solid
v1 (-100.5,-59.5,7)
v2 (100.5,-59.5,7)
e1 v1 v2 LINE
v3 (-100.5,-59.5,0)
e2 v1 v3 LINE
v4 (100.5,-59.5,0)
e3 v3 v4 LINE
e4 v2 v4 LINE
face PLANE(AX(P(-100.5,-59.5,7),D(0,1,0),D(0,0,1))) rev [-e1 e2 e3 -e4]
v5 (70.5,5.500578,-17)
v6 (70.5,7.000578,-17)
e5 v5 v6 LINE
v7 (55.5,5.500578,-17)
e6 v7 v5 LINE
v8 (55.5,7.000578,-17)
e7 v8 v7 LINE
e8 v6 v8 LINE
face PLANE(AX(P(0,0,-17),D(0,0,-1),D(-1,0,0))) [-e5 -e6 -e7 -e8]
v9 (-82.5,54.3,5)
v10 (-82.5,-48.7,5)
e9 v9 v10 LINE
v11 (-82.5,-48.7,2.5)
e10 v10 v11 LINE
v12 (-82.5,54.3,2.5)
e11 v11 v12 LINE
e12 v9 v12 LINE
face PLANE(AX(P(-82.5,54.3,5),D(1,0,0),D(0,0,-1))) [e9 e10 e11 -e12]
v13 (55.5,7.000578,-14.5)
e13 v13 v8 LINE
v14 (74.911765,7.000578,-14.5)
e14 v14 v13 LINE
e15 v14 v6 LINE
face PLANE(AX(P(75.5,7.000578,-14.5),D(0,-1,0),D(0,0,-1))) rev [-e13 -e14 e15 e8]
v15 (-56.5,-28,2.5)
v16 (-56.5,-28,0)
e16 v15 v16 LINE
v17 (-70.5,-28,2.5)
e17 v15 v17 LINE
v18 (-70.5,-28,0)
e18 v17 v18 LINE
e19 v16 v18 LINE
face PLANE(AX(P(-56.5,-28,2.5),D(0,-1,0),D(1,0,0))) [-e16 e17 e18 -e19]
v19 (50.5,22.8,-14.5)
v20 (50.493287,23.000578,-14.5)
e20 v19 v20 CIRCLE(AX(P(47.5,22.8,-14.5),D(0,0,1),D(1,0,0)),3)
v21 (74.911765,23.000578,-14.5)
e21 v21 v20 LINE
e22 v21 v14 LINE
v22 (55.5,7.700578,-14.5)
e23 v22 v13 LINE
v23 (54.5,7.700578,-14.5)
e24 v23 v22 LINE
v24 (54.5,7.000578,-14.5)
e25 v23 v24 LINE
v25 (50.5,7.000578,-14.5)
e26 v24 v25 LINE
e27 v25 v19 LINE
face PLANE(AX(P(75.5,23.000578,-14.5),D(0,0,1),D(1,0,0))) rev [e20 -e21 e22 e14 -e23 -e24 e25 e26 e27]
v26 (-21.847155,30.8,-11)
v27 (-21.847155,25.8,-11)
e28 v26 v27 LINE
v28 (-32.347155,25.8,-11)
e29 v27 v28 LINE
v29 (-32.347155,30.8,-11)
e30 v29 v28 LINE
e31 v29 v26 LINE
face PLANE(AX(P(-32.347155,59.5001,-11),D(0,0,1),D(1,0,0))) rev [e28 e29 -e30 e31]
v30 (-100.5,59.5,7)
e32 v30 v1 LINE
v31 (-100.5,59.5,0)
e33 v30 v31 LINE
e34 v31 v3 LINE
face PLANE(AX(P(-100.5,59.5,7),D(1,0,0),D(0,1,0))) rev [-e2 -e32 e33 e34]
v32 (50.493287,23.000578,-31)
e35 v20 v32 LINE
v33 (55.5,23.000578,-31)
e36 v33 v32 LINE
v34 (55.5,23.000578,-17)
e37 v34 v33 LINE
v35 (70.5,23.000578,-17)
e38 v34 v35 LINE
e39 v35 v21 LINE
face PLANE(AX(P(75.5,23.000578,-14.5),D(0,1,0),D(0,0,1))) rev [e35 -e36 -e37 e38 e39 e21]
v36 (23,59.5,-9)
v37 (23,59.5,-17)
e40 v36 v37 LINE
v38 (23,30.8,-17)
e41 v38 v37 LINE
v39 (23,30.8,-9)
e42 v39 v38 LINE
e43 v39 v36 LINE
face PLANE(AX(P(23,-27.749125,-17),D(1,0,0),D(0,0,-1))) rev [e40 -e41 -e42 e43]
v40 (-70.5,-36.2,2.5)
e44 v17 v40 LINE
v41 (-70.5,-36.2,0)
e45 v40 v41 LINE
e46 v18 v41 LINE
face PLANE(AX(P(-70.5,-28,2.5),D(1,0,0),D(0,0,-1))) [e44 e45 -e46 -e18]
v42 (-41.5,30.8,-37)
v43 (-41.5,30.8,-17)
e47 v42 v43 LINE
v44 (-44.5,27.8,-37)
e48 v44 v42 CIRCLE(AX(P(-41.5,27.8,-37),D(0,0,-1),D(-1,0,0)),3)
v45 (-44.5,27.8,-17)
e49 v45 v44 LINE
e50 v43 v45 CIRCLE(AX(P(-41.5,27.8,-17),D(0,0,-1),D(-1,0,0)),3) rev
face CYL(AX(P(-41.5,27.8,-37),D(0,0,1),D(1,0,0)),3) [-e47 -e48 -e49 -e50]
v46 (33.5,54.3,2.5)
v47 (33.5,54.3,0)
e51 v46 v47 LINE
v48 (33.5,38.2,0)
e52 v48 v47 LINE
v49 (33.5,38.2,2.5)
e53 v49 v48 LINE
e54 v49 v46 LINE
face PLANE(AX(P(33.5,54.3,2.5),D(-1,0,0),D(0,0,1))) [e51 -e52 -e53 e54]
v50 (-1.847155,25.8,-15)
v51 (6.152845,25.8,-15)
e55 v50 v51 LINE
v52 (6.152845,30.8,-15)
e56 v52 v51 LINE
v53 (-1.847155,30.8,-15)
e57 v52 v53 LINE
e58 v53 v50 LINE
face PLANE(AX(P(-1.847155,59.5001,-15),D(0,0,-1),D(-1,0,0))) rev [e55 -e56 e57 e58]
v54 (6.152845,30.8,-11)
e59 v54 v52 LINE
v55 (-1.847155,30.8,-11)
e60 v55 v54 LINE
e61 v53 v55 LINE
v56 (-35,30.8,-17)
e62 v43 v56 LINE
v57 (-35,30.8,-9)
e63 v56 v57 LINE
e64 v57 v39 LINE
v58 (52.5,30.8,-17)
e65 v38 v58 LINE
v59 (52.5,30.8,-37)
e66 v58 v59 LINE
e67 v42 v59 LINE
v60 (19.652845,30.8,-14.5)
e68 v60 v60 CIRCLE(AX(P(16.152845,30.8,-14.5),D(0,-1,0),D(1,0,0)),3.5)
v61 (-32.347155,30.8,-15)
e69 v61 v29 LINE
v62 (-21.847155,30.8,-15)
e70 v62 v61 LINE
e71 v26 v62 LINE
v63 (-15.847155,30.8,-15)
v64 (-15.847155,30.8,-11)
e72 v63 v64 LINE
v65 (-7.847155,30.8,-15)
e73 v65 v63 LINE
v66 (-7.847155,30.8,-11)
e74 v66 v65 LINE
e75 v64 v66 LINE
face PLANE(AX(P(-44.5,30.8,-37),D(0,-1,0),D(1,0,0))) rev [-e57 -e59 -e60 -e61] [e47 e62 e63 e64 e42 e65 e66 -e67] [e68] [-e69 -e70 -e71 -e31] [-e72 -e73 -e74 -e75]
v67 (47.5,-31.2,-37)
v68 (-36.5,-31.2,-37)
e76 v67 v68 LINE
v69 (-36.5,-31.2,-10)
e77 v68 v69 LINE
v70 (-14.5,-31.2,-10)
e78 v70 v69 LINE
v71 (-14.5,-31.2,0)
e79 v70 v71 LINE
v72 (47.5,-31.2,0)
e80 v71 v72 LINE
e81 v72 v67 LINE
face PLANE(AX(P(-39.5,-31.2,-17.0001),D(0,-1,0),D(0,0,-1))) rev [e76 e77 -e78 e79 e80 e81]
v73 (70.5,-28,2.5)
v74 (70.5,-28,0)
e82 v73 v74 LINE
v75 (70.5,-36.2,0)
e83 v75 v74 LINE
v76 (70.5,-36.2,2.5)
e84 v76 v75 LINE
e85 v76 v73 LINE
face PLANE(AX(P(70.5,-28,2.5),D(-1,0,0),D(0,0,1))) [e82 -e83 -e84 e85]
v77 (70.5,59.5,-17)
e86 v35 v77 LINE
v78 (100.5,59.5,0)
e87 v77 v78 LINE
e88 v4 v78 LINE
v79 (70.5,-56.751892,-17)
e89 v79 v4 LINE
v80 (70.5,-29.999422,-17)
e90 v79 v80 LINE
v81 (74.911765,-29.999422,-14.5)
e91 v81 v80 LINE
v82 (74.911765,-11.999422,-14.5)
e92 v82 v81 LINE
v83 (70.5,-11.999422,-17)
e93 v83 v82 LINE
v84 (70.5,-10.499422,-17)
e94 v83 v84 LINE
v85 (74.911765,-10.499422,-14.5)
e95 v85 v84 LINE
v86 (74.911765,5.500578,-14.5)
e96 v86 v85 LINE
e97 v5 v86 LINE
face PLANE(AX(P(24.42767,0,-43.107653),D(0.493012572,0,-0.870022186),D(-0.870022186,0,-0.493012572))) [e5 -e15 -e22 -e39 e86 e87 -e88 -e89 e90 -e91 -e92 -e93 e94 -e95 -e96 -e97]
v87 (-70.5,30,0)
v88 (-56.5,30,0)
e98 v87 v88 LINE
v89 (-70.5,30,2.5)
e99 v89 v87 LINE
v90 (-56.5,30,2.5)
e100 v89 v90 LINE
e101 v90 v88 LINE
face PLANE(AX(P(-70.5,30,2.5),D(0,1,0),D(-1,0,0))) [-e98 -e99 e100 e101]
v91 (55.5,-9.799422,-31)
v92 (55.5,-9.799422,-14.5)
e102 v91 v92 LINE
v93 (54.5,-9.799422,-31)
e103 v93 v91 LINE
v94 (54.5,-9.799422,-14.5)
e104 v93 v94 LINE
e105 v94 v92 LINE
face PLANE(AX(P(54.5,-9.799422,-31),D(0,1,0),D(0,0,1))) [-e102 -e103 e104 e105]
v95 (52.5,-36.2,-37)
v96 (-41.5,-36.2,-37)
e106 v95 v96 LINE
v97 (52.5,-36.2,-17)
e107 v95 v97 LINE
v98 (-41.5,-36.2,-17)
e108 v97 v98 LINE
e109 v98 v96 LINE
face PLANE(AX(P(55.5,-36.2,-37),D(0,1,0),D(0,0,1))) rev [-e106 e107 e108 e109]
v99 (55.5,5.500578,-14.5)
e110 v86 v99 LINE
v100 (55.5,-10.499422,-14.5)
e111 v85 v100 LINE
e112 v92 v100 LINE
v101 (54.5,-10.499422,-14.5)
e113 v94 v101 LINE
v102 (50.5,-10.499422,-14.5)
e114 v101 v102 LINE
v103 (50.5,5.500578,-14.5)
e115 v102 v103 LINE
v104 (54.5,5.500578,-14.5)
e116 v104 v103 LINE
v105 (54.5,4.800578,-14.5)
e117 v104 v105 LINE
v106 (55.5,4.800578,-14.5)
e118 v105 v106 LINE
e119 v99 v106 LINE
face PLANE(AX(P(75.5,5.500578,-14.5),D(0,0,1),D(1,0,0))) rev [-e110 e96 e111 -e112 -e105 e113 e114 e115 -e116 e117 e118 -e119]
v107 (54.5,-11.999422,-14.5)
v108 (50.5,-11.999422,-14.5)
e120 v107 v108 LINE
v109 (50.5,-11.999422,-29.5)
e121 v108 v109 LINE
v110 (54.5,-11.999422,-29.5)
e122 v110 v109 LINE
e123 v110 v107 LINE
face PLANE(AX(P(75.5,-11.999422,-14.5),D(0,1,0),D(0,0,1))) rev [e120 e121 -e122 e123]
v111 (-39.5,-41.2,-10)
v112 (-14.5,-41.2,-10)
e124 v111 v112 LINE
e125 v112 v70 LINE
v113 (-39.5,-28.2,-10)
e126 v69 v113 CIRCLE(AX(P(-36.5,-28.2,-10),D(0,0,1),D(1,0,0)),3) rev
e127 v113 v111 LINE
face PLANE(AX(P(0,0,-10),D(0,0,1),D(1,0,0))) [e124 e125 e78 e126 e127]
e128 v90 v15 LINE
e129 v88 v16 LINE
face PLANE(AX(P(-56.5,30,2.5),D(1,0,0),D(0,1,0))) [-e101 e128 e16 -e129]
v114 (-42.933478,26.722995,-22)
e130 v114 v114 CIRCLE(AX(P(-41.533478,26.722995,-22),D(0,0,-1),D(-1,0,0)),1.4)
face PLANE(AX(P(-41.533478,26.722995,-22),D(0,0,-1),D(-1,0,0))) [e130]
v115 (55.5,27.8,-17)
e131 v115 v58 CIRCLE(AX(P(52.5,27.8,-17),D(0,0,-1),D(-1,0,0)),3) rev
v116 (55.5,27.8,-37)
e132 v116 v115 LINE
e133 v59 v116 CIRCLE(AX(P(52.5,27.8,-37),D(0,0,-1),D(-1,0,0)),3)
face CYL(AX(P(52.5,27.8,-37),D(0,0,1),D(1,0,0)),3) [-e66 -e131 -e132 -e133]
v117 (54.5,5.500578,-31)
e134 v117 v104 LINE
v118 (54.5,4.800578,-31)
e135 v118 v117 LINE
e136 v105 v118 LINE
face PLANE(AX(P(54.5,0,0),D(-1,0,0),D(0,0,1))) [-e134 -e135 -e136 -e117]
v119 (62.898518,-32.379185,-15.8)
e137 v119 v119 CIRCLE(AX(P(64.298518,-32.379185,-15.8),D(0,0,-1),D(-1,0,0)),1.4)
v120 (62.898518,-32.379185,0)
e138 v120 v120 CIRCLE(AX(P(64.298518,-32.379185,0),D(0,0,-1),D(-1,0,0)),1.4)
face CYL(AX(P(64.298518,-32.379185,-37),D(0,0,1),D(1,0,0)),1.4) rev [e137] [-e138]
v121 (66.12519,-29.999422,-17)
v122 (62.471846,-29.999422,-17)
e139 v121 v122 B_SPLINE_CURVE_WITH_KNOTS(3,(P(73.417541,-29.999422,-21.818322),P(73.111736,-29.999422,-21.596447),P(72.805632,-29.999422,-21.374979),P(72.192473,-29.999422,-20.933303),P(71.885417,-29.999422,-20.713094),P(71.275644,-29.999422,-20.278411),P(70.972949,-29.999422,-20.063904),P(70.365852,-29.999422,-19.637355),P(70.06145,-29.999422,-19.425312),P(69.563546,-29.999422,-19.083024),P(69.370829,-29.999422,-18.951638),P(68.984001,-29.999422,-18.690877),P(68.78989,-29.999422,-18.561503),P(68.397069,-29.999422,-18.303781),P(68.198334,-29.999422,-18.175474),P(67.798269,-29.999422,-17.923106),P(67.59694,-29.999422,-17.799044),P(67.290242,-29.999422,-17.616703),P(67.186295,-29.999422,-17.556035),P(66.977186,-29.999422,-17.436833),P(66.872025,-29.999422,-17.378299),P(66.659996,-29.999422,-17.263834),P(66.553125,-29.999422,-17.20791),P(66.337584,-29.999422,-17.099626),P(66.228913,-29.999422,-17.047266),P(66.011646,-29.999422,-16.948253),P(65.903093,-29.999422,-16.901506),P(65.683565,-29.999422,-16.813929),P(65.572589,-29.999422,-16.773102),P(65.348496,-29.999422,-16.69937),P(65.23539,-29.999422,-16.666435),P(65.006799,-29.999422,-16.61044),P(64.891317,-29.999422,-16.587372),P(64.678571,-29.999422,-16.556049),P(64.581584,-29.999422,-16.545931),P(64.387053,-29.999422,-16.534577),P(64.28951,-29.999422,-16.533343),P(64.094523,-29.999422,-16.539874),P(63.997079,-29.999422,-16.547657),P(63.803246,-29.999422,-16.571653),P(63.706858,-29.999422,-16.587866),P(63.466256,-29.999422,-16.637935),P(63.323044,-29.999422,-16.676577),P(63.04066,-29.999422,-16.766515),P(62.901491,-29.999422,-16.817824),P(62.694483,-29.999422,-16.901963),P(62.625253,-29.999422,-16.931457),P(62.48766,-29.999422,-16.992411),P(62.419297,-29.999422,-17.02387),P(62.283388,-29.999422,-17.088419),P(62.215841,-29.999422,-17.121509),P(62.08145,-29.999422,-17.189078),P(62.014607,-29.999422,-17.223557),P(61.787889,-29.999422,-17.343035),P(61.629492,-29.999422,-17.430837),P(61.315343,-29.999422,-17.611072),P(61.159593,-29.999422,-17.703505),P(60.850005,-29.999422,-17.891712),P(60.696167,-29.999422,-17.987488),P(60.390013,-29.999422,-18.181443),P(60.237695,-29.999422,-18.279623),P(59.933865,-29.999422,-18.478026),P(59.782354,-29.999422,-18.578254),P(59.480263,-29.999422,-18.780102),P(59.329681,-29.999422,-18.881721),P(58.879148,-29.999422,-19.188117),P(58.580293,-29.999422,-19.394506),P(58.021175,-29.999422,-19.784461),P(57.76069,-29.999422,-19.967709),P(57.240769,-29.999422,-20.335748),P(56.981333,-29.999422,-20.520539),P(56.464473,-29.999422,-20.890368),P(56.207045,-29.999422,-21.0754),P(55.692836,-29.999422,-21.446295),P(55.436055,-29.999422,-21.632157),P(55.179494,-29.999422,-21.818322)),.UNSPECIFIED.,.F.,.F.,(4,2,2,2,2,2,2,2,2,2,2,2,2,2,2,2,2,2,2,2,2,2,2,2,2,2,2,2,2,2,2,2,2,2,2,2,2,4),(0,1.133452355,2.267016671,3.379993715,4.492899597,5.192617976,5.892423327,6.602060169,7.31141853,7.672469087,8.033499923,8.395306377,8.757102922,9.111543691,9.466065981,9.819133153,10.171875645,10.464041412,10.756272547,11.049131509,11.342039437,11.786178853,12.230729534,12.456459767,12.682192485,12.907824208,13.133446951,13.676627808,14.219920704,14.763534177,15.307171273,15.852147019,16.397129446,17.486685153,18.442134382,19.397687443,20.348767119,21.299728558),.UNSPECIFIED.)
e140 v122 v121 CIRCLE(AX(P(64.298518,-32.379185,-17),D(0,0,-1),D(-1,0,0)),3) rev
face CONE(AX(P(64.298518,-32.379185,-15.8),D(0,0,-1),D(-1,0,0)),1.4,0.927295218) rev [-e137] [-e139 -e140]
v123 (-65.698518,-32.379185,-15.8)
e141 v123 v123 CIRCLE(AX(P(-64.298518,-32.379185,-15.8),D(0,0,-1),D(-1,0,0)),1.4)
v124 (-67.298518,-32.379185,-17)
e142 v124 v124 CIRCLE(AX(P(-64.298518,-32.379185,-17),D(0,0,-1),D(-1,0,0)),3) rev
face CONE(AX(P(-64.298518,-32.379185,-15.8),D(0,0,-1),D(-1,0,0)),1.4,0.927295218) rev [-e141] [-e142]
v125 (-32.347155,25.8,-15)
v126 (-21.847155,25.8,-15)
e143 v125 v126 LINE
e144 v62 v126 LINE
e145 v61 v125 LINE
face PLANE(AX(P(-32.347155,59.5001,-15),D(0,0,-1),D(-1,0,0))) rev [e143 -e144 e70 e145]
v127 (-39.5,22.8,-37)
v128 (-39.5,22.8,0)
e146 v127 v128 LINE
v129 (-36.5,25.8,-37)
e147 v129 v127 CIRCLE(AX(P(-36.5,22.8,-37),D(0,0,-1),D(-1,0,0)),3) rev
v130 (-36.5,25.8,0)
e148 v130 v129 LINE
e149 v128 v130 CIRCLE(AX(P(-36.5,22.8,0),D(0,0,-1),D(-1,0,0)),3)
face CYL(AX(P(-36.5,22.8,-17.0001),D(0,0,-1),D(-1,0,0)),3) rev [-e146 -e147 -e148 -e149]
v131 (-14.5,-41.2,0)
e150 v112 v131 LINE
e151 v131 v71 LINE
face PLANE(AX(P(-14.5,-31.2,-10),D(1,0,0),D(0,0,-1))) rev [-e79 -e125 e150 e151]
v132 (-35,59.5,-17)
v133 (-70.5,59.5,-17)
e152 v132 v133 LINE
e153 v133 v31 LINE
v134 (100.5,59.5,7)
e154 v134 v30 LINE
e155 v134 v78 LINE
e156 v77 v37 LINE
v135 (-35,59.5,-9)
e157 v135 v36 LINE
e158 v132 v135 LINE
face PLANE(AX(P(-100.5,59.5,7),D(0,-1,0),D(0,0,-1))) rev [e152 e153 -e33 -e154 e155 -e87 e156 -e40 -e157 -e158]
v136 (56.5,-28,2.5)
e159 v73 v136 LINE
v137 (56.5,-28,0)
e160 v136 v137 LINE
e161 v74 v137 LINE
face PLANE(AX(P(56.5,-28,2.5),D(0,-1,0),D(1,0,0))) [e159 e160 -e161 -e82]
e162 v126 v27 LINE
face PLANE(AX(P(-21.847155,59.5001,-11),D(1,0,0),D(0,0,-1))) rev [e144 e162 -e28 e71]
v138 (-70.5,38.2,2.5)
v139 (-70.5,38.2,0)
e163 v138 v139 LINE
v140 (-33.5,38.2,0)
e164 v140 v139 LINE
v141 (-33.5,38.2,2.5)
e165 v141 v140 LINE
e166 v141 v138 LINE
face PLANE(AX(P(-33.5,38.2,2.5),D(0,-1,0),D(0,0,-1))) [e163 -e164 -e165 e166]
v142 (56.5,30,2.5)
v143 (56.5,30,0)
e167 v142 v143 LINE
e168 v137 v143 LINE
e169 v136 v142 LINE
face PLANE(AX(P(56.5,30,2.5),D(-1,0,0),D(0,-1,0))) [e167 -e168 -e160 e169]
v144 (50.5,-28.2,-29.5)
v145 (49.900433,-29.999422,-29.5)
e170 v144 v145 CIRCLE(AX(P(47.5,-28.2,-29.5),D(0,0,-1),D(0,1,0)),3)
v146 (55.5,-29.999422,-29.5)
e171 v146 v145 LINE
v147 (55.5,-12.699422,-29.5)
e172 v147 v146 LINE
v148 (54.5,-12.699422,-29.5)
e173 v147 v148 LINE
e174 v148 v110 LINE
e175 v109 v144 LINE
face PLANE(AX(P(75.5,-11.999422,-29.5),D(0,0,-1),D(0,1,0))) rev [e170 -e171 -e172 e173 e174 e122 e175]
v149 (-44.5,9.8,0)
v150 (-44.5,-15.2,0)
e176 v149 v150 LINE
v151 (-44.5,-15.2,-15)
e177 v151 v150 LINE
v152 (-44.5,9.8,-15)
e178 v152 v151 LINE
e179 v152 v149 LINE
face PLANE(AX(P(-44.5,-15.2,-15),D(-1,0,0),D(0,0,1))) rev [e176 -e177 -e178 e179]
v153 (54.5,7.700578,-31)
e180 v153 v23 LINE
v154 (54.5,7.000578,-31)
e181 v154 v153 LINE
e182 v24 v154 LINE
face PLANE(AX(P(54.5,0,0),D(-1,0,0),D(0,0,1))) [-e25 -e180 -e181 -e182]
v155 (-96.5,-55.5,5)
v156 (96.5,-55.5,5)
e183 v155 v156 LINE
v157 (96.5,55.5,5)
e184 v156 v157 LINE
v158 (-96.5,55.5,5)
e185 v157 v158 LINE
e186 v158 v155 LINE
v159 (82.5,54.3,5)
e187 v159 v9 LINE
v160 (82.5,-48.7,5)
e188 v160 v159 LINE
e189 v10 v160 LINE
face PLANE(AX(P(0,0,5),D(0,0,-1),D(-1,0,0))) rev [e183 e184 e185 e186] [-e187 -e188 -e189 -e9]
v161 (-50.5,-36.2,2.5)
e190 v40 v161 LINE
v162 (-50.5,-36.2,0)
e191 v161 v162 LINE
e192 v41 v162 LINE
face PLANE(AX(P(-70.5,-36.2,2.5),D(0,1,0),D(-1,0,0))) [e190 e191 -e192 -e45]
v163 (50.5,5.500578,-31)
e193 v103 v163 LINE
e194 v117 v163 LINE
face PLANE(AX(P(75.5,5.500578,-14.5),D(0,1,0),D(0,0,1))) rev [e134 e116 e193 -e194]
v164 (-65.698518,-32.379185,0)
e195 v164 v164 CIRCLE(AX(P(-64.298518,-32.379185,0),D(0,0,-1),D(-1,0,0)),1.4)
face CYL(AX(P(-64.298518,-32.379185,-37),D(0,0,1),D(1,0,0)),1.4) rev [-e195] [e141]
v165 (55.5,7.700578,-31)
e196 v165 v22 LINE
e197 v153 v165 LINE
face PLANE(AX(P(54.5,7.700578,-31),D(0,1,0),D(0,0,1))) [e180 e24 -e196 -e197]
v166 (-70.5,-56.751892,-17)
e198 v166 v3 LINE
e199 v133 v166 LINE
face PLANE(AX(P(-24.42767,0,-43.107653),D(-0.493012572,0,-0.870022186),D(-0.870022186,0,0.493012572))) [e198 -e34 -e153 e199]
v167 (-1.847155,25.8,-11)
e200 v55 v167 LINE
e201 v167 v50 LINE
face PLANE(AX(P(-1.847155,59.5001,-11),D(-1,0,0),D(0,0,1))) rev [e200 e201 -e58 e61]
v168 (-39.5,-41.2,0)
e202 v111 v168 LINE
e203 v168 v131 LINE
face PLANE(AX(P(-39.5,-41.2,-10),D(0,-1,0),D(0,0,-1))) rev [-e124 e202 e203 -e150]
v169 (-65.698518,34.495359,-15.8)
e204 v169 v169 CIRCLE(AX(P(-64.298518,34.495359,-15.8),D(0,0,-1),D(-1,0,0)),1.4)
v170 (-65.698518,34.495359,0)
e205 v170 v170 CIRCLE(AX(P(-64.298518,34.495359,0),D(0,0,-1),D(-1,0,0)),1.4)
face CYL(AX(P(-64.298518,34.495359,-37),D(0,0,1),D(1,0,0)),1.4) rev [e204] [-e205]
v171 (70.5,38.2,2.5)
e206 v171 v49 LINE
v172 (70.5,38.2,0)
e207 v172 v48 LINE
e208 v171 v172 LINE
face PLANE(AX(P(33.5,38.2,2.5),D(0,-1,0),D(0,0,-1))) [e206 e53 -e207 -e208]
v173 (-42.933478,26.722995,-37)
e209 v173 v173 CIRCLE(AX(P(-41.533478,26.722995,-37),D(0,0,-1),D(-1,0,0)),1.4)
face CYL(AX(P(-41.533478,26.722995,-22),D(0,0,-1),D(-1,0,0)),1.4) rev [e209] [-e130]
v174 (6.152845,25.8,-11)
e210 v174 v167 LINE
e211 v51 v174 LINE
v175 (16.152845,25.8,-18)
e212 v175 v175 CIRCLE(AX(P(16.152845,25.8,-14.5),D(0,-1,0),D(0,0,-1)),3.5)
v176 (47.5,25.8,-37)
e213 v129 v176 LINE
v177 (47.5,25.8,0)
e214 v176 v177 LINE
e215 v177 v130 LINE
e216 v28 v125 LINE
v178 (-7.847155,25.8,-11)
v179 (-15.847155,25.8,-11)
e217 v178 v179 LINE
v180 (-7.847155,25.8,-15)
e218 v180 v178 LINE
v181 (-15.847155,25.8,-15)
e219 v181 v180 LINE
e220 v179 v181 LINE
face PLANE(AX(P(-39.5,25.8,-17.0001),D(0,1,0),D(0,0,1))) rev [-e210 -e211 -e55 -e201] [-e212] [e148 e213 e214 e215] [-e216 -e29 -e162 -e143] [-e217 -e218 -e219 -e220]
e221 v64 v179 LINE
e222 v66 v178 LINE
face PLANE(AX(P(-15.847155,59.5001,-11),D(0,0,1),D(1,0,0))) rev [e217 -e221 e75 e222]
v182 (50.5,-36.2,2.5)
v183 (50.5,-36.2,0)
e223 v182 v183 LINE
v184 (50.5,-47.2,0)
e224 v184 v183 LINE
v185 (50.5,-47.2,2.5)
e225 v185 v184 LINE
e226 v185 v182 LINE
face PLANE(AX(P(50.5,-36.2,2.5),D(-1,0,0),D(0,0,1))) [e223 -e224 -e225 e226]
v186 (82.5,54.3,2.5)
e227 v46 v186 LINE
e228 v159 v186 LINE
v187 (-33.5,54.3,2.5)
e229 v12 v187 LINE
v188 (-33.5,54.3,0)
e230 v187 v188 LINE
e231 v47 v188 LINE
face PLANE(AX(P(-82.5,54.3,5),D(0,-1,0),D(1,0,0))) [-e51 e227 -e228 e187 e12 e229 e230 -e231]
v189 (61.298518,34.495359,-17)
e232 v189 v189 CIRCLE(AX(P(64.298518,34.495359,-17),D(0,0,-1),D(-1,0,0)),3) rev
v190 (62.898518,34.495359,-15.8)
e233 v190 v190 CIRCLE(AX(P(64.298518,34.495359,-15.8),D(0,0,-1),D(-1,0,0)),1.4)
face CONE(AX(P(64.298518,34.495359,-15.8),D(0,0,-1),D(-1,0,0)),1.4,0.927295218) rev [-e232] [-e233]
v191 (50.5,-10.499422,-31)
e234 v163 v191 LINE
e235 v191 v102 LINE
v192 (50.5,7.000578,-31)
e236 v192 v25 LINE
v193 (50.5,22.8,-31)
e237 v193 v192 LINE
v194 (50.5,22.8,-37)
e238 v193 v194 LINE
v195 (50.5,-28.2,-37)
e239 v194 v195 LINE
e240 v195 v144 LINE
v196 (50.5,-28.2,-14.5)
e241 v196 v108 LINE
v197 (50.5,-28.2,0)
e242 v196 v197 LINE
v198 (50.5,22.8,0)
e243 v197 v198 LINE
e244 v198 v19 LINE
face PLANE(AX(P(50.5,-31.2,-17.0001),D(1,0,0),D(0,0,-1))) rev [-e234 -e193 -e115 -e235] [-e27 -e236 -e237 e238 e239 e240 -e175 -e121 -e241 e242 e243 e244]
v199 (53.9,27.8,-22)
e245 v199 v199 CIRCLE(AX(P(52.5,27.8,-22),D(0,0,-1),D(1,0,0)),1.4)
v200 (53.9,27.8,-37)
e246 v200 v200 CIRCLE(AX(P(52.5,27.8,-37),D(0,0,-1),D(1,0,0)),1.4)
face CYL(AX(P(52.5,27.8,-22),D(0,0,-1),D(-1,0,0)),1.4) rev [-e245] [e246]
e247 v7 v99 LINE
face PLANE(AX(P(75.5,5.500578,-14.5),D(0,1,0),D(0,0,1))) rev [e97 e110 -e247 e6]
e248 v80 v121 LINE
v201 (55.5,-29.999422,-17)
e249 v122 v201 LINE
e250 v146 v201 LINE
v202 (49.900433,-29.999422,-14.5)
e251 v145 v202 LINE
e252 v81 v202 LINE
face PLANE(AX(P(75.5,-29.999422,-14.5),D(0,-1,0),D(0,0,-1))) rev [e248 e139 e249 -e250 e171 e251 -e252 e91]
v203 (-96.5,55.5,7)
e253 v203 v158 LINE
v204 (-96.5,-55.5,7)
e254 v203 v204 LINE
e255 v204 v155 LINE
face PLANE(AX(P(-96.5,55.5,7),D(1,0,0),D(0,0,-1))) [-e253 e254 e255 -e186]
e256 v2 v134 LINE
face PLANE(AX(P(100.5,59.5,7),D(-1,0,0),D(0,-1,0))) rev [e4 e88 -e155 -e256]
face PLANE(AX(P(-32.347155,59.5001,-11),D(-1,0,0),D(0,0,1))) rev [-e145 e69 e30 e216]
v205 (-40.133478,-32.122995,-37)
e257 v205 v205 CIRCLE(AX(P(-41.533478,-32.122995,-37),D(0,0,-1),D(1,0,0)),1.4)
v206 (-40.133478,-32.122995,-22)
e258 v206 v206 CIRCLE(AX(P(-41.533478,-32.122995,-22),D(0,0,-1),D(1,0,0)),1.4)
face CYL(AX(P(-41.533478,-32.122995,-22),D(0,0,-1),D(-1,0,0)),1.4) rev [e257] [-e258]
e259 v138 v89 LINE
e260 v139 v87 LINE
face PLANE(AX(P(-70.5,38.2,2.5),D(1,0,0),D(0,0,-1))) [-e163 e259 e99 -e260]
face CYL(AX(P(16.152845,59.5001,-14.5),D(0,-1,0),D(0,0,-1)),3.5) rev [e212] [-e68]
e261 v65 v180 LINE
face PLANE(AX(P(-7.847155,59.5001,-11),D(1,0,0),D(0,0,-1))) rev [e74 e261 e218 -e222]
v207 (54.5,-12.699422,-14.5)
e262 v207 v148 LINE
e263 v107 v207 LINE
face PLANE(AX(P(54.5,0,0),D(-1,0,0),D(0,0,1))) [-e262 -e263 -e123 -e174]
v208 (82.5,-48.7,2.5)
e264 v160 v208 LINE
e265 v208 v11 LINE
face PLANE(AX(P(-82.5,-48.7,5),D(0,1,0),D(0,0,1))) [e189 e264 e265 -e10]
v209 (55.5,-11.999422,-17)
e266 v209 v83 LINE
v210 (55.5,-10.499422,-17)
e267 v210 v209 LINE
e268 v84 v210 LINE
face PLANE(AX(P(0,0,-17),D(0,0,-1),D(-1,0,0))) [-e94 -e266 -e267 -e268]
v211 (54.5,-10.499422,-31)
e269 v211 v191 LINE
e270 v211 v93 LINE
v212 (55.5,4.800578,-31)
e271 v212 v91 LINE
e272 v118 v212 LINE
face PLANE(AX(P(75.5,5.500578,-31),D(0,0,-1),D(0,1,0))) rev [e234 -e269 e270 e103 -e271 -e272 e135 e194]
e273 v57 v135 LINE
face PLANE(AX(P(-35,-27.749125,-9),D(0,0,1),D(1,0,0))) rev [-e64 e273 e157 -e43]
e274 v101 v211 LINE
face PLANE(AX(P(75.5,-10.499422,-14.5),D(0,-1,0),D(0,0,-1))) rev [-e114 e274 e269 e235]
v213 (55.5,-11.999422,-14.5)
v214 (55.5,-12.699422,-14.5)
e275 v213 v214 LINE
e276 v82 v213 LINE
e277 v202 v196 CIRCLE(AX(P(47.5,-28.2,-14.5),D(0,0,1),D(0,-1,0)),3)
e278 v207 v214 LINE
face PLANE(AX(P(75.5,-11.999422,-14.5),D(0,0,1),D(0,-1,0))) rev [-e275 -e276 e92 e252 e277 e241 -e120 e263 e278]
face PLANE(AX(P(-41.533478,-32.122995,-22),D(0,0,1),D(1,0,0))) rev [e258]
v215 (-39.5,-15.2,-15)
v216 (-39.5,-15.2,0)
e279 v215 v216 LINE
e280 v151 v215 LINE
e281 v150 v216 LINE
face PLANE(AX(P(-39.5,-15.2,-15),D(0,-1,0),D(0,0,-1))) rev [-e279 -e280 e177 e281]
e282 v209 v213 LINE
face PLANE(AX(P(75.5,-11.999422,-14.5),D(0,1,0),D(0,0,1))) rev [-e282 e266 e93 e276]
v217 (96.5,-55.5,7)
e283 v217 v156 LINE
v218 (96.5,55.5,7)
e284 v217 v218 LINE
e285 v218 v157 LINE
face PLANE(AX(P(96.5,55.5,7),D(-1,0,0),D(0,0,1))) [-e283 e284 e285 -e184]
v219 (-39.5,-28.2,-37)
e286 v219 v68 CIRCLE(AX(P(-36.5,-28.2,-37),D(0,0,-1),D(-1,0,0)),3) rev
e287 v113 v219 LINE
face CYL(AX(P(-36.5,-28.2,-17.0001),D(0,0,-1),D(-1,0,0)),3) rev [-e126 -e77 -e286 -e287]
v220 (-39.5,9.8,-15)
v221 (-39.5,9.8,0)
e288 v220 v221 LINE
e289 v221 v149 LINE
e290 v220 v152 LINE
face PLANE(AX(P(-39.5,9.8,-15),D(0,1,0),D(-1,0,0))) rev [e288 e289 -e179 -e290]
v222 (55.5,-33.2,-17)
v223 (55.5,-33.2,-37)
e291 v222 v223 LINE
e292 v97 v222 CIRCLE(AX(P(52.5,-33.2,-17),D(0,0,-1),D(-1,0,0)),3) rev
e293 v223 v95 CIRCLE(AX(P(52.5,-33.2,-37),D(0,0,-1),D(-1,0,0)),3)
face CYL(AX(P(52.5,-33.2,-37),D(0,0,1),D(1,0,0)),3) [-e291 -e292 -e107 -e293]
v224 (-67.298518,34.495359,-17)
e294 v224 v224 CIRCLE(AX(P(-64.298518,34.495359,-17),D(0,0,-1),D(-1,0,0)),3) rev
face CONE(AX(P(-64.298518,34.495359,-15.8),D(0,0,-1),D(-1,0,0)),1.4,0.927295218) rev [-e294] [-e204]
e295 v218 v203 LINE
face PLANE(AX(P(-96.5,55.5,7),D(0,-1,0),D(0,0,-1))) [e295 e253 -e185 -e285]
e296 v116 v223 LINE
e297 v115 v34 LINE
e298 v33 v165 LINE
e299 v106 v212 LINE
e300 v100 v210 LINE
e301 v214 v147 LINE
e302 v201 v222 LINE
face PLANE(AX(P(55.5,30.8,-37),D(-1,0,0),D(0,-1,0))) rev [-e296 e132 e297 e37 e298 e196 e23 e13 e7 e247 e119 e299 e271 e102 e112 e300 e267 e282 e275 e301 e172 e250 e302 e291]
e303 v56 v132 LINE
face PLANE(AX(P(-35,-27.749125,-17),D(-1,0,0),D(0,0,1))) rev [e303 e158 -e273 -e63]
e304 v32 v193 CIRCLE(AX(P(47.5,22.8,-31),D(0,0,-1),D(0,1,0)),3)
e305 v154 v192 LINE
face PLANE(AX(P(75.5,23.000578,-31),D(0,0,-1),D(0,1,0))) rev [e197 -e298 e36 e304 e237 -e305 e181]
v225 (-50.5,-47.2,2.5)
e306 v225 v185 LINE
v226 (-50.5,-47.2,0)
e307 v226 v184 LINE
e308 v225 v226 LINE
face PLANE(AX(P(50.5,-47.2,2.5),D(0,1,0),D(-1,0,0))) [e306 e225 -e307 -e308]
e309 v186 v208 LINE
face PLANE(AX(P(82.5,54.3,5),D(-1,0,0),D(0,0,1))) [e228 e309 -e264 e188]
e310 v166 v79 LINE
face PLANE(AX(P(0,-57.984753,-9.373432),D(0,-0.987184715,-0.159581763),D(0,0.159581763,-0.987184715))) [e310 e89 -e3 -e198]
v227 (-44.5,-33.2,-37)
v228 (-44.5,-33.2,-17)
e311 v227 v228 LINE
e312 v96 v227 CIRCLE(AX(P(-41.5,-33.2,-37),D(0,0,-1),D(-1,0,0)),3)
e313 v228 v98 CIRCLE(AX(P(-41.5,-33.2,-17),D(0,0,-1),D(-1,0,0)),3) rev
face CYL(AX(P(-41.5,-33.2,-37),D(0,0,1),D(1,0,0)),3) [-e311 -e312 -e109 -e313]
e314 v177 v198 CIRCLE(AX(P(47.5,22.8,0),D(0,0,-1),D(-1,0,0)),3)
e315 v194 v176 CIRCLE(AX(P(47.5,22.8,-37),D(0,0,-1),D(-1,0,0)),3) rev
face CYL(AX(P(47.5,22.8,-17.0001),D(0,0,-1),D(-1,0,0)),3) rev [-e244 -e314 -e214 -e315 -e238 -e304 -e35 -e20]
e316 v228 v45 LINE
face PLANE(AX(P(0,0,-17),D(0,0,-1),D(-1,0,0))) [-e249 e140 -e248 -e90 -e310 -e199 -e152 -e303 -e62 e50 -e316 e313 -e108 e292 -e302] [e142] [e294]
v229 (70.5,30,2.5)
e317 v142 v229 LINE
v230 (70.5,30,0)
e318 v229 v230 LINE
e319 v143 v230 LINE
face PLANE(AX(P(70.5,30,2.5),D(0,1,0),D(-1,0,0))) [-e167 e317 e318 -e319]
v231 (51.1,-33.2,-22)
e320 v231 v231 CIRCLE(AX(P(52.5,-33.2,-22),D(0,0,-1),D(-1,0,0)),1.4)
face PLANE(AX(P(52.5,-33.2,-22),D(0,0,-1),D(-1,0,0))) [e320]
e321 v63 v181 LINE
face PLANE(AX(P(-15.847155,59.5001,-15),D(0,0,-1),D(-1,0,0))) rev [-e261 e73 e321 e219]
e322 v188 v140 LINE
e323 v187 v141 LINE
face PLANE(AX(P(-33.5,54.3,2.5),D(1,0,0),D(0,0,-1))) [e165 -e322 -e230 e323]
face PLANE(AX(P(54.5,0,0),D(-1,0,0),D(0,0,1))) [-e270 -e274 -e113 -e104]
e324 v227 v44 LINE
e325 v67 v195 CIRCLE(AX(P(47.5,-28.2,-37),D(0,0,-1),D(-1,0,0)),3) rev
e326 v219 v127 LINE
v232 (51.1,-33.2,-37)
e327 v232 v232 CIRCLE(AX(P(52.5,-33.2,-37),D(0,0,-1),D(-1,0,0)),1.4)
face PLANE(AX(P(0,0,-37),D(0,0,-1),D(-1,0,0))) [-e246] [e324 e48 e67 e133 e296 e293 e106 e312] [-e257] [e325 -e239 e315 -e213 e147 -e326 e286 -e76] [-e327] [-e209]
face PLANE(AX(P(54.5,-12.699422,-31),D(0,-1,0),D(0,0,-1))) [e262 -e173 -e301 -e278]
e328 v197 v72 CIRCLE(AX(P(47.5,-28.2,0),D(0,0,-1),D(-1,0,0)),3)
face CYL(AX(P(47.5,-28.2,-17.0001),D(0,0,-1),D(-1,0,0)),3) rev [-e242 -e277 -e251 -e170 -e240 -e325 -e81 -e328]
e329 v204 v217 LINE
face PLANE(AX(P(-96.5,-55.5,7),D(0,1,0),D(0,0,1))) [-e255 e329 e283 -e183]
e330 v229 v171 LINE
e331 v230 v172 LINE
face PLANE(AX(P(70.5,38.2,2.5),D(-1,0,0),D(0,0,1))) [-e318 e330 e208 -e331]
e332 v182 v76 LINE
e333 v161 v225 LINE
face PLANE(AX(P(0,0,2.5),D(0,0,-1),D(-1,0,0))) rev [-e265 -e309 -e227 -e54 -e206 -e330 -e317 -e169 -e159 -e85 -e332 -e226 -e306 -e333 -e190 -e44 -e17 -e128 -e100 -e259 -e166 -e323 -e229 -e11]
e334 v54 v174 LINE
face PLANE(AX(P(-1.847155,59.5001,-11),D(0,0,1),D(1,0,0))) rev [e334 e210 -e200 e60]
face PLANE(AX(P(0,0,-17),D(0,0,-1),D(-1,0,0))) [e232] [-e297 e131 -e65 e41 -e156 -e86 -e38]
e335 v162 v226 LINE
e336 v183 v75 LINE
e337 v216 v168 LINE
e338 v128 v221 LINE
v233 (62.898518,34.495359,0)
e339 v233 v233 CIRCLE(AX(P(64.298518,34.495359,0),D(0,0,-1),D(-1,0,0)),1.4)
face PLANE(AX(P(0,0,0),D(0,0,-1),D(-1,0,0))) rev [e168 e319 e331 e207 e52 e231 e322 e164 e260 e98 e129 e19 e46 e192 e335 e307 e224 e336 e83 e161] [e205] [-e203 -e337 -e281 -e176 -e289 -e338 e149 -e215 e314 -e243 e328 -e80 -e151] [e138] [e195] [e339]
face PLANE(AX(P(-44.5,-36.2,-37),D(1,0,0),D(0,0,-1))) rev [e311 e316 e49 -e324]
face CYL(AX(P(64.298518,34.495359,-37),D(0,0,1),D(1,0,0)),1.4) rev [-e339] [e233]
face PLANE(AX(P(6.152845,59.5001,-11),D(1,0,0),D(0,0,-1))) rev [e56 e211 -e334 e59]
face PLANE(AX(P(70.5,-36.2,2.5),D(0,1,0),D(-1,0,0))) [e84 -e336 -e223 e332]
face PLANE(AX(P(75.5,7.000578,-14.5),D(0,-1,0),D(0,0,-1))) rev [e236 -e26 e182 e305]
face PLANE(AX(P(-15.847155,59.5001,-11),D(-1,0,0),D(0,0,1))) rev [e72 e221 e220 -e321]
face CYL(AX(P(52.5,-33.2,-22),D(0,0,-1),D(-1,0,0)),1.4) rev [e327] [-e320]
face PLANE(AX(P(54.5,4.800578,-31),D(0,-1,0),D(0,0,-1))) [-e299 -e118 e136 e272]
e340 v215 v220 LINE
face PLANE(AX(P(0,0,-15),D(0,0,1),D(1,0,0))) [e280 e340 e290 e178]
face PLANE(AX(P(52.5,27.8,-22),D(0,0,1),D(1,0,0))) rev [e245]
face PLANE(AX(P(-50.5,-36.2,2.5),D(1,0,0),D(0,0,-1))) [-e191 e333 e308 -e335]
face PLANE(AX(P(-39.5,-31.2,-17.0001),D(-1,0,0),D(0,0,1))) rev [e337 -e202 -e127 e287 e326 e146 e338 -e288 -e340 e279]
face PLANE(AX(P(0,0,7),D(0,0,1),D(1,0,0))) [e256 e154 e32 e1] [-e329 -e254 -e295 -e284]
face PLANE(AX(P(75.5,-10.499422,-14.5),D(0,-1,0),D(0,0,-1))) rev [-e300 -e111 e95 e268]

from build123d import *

# Parameters (mm, degrees)
SKETCH_1_W               = 201
SKETCH_1_H               = 119
SKETCH_1_W_2             = 193
SKETCH_1_H_2             = 111
EXTRUDE_1_DEPTH          = 7
SKETCH_2_W               = 193
SKETCH_2_H               = 111
SKETCH_2_W_2             = 165
SKETCH_2_H_2             = 103
EXTRUDE_2_DEPTH          = 5
EXTRUDE_3_DEPTH          = 2.5
LOFT_START               = -59.5
LOFT_1_DEPTH             = 119
LOFT_START_2             = -62
LOFT_1_2_OUTLINE_W       = 204
LOFT_1_2_OUTLINE_H       = 20
LOFT_1_2_DEPTH           = 3.262509478
SKETCH_6_W               = 90
SKETCH_6_H               = 57
CUT_EXTRUDE_1_DEPTH      = 119.023302788
SKETCH_7_W               = 100
SKETCH_7_H               = 67
SKETCH_7_W_2             = 90
SKETCH_7_H_2             = 57
EXTRUDE_4_DEPTH          = 20
CUT_EXTRUDE_2_DEPTH      = 123.513264592
CUT_EXTRUDE_2_DEPTH_BACK = 123.513264592
SKETCH_8_R               = 1.4
CHAMFER_1_SIZE           = 1.6
CHAMFER_1_SIZE2          = 1.2
SKETCH_9_W               = 25
SKETCH_9_H               = 10
CUT_EXTRUDE_3_DEPTH      = 10
SKETCH_11_W              = 5
SKETCH_11_H              = 25
CUT_EXTRUDE_4_DEPTH      = 15
SKETCH_12_W              = 16.5
SKETCH_12_H              = 16
SKETCH_12_W_2            = 15
SKETCH_12_H_2            = 18
CUT_EXTRUDE_5_DEPTH      = 25
SKETCH_13_R              = 3.5
SKETCH_13_W              = 10.5
SKETCH_13_H              = 4
SKETCH_13_W_2            = 8
CUT_EXTRUDE_6_DEPTH      = 137.913622409
SKETCH_14_W              = 58
SKETCH_14_H              = 8
CUT_EXTRUDE_7_DEPTH      = 28.7
SKETCH_16_W              = 16.5
SKETCH_16_H              = 2.9
EXTRUDE_5_DEPTH          = 1
FILLET_1_R               = 3
SKETCH_17_R              = 1.4
CUT_EXTRUDE_8_DEPTH      = 15


with BuildPart() as part:
    # 스케치1 → 보스-돌출1 (new body)
    with BuildSketch(Plane.XY):
        Rectangle(SKETCH_1_W, SKETCH_1_H)
        Rectangle(SKETCH_1_W_2, SKETCH_1_H_2, mode=Mode.SUBTRACT)
    extrude(amount=EXTRUDE_1_DEPTH)

    # 스케치2 → 보스-돌출2 (add)
    with BuildSketch(Plane.XY):
        Rectangle(SKETCH_2_W, SKETCH_2_H)
        with Locations((0, 2.8)):
            Rectangle(SKETCH_2_W_2, SKETCH_2_H_2, mode=Mode.SUBTRACT)
    extrude(amount=EXTRUDE_2_DEPTH)

    # 스케치3 → 보스-돌출3 (add)
    with BuildSketch(Plane.XY):
        Polygon((100.5, 59.5), (23.488425816, 59.5), (-23.488425816, 59.5), (-100.5, 59.5), (-100.5, -59.5), (-40.50450245, -59.5), (40.50450245, -59.5), (100.5, -59.5), align=None)
        Polygon((33.5, 54.3), (33.5, 38.2), (70.5, 38.2), (70.5, 30), (56.5, 30), (56.5, -28), (70.5, -28), (70.5, -36.2), (50.5, -36.2), (50.5, -47.2), (-50.5, -47.2), (-50.5, -36.2), (-70.5, -36.2), (-70.5, -28), (-56.5, -28), (-56.5, 30), (-70.5, 30), (-70.5, 38.2), (-33.5, 38.2), (-33.5, 54.3), align=None, mode=Mode.SUBTRACT)
    extrude(amount=EXTRUDE_3_DEPTH)

    # 로프트1: read off the stored shape, not the designer's step
    # 로프트1 outline → 로프트1 (add)
    with BuildSketch(Plane(origin=(0, 0, 0), x_dir=(1, 0, 0), z_dir=(0, 1, 0)).offset(LOFT_START)):
        Polygon((-100.5, 0), (100.5, 0), (70.5, 17), (-70.5, 17), align=None)
    extrude(amount=LOFT_1_DEPTH)

    # Loft 1 2 outline → Loft 1 2 (cut)
    with BuildSketch(Plane(origin=(0, 0, 0), x_dir=(1, 0, 0), z_dir=(0, 0.987184714663186, 0.15958176316661)).offset(LOFT_START_2)):
        with Locations((0, -1)):
            Rectangle(LOFT_1_2_OUTLINE_W, LOFT_1_2_OUTLINE_H)
    extrude(amount=LOFT_1_2_DEPTH, mode=Mode.SUBTRACT)

    # 스케치6 → 컷-돌출1 (cut, through all)
    with BuildSketch(Plane.XY):
        with Locations((5.5, -2.7)):
            Rectangle(SKETCH_6_W, SKETCH_6_H)
    extrude(amount=-CUT_EXTRUDE_1_DEPTH, mode=Mode.SUBTRACT)

    # 스케치7 → 보스-돌출4 (add)
    with BuildSketch(Plane(origin=(0, 0, -17), x_dir=(-1, 0, 0), z_dir=(0, 0, -1))):
        with Locations((-5.5, -2.7)):
            Rectangle(SKETCH_7_W, SKETCH_7_H)
        with Locations((-5.5, -2.7)):
            Rectangle(SKETCH_7_W_2, SKETCH_7_H_2, mode=Mode.SUBTRACT)
    extrude(amount=EXTRUDE_4_DEPTH)

    # 스케치8 → 컷-돌출2 (cut, two sides: drawn at the far end of the back side and taken through both)
    with BuildSketch(Plane.XY.offset(-CUT_EXTRUDE_2_DEPTH_BACK)):
        with Locations(Location((-64.298517718, 34.495358942, 0), (0, 0, 180))):
            Circle(SKETCH_8_R)
        with Locations(Location((-64.298517718, -32.379184814, 0), (0, 0, 180))):
            Circle(SKETCH_8_R)
        with Locations(Location((64.298517718, -32.379184814, 0), (0, 0, 180))):
            Circle(SKETCH_8_R)
        with Locations(Location((64.298517718, 34.495358942, 0), (0, 0, 180))):
            Circle(SKETCH_8_R)
    extrude(amount=CUT_EXTRUDE_2_DEPTH + CUT_EXTRUDE_2_DEPTH_BACK, mode=Mode.SUBTRACT)

    # 모따기1
    chamfer_1_edges = [part.edges().sort_by_distance(p)[0] for p in [
        (65.698517718, 34.495358942, -17),
        (65.698517718, -32.379184814, -17),
        (-62.898517718, -32.379184814, -17),
        (-62.898517718, 34.495358942, -17),
    ]]
    chamfer_1_side = [part.faces().sort_by_distance(p)[0] for p in [
        (0, -54.924448604, -17),
    ]]
    chamfer(chamfer_1_edges, length=CHAMFER_1_SIZE, length2=CHAMFER_1_SIZE2, reference=chamfer_1_side[0])

    # 스케치9 → 컷-돌출3 (cut)
    with BuildSketch(Plane.XY):
        with Locations((-27, -36.2)):
            Rectangle(SKETCH_9_W, SKETCH_9_H)
    extrude(amount=-CUT_EXTRUDE_3_DEPTH, mode=Mode.SUBTRACT)

    # 스케치11 → 컷-돌출4 (cut)
    with BuildSketch(Plane.XY):
        with Locations((-42, -2.7)):
            Rectangle(SKETCH_11_W, SKETCH_11_H)
    extrude(amount=-CUT_EXTRUDE_4_DEPTH, mode=Mode.SUBTRACT)

    # 스케치12 → 컷-돌출5 (cut)
    with BuildSketch(Plane.ZY.offset(-50.5)):
        with Locations((-22.75, 15.000577725)):
            Rectangle(SKETCH_12_W, SKETCH_12_H)
        with Locations((-22.75, -2.499422275)):
            Rectangle(SKETCH_12_W, SKETCH_12_H)
        with Locations((-22, -20.999422275)):
            Rectangle(SKETCH_12_W_2, SKETCH_12_H_2)
    extrude(amount=-CUT_EXTRUDE_5_DEPTH, mode=Mode.SUBTRACT)

    # 스케치13 → 컷-돌출6 (cut, through all)
    with BuildSketch(Plane.XZ.offset(-25.8)):
        with Locations(Location((16.152845052, -14.5, 0), (0, 0, 270))):
            Circle(SKETCH_13_R)
        with Locations((-27.097154948, -13)):
            Rectangle(SKETCH_13_W, SKETCH_13_H)
        with Locations((-11.847154948, -13)):
            Rectangle(SKETCH_13_W_2, SKETCH_13_H)
        with Locations((2.152845052, -13)):
            Rectangle(SKETCH_13_W_2, SKETCH_13_H)
    extrude(amount=-CUT_EXTRUDE_6_DEPTH, mode=Mode.SUBTRACT)

    # 스케치14 → 컷-돌출7 (cut)
    with BuildSketch(Plane(origin=(0, 59.5, 0), x_dir=(1, 0, 0), z_dir=(0, 1, 0))):
        with Locations((-6, 13)):
            Rectangle(SKETCH_14_W, SKETCH_14_H)
    extrude(amount=-CUT_EXTRUDE_7_DEPTH, mode=Mode.SUBTRACT)

    # 스케치16 → 보스-돌출5 (add)
    with BuildSketch(Plane(origin=(55.5, 0, 0), x_dir=(0, 0, -1), z_dir=(1, 0, 0))):
        with Locations((22.75, 6.250577725)):
            Rectangle(SKETCH_16_W, SKETCH_16_H)
        with Locations((22.75, -11.249422275)):
            Rectangle(SKETCH_16_W, SKETCH_16_H)
    extrude(amount=-EXTRUDE_5_DEPTH)

    # 필렛1
    # the kernel refuses this fillet: 3 mm, written as the material it adds along each edge
    with BuildSketch(Plane(origin=(50.5, -31.2, 0), x_dir=(0, 1, 0), z_dir=(0, 0, -1))) as fillet_1_piece_1_section:
        with BuildLine():
            CenterArc((FILLET_1_R, -FILLET_1_R), FILLET_1_R, 90, 90)
            Line((0, -FILLET_1_R), (0, 0))
            Line((0, 0), (FILLET_1_R, 0))
        make_face()
    fillet_1_piece_1 = extrude(amount=37, mode=Mode.PRIVATE)
    fillet_1_piece_1 = split(fillet_1_piece_1, bisect_by=Plane(origin=(50.5, -29.999422275, 0), z_dir=(0, 1, 0)), keep=Keep.TOP, mode=Mode.PRIVATE)
    fillet_1_piece_1 = split(fillet_1_piece_1, bisect_by=Plane(origin=(50.5, -31.2, -14.5), z_dir=(0, 0, 1)), keep=Keep.TOP, mode=Mode.PRIVATE)
    add(fillet_1_piece_1)
    with BuildSketch(Plane(origin=(50.5, -31.2, 0), x_dir=(0, 1, 0), z_dir=(0, 0, -1))) as fillet_1_piece_2_section:
        with BuildLine():
            CenterArc((FILLET_1_R, -FILLET_1_R), FILLET_1_R, 90, 90)
            Line((0, -FILLET_1_R), (0, 0))
            Line((0, 0), (FILLET_1_R, 0))
        make_face()
    fillet_1_piece_2 = extrude(amount=37, mode=Mode.PRIVATE)
    fillet_1_piece_2 = split(fillet_1_piece_2, bisect_by=Plane(origin=(50.5, -29.999422275, 0), z_dir=(0, -1, 0)), keep=Keep.TOP, mode=Mode.PRIVATE)
    fillet_1_piece_2 = split(fillet_1_piece_2, bisect_by=Plane(origin=(50.5, -31.2, -14.5), z_dir=(0, 0, 1)), keep=Keep.TOP, mode=Mode.PRIVATE)
    add(fillet_1_piece_2)
    with BuildSketch(Plane(origin=(50.5, -31.2, 0), x_dir=(0, 1, 0), z_dir=(0, 0, -1))) as fillet_1_piece_3_section:
        with BuildLine():
            CenterArc((FILLET_1_R, -FILLET_1_R), FILLET_1_R, 90, 90)
            Line((0, -FILLET_1_R), (0, 0))
            Line((0, 0), (FILLET_1_R, 0))
        make_face()
    fillet_1_piece_3 = extrude(amount=37, mode=Mode.PRIVATE)
    fillet_1_piece_3 = split(fillet_1_piece_3, bisect_by=Plane(origin=(50.5, -29.999422275, 0), z_dir=(0, -1, 0)), keep=Keep.TOP, mode=Mode.PRIVATE)
    fillet_1_piece_3 = split(fillet_1_piece_3, bisect_by=Plane(origin=(50.5, -31.2, -29.5), z_dir=(0, 0, 1)), keep=Keep.TOP, mode=Mode.PRIVATE)
    fillet_1_piece_3 = split(fillet_1_piece_3, bisect_by=Plane(origin=(50.5, -31.2, -14.5), z_dir=(0, 0, -1)), keep=Keep.TOP, mode=Mode.PRIVATE)
    add(fillet_1_piece_3)
    with BuildSketch(Plane(origin=(50.5, -31.2, 0), x_dir=(0, 1, 0), z_dir=(0, 0, -1))) as fillet_1_piece_4_section:
        with BuildLine():
            CenterArc((FILLET_1_R, -FILLET_1_R), FILLET_1_R, 90, 90)
            Line((0, -FILLET_1_R), (0, 0))
            Line((0, 0), (FILLET_1_R, 0))
        make_face()
    fillet_1_piece_4 = extrude(amount=37, mode=Mode.PRIVATE)
    fillet_1_piece_4 = split(fillet_1_piece_4, bisect_by=Plane(origin=(50.5, -29.999422275, 0), z_dir=(0, 1, 0)), keep=Keep.TOP, mode=Mode.PRIVATE)
    fillet_1_piece_4 = split(fillet_1_piece_4, bisect_by=Plane(origin=(50.5, -31.2, -29.5), z_dir=(0, 0, -1)), keep=Keep.TOP, mode=Mode.PRIVATE)
    add(fillet_1_piece_4)
    with BuildSketch(Plane(origin=(50.5, -31.2, 0), x_dir=(0, 1, 0), z_dir=(0, 0, -1))) as fillet_1_piece_5_section:
        with BuildLine():
            CenterArc((FILLET_1_R, -FILLET_1_R), FILLET_1_R, 90, 90)
            Line((0, -FILLET_1_R), (0, 0))
            Line((0, 0), (FILLET_1_R, 0))
        make_face()
    fillet_1_piece_5 = extrude(amount=37, mode=Mode.PRIVATE)
    fillet_1_piece_5 = split(fillet_1_piece_5, bisect_by=Plane(origin=(50.5, -29.999422275, 0), z_dir=(0, -1, 0)), keep=Keep.TOP, mode=Mode.PRIVATE)
    fillet_1_piece_5 = split(fillet_1_piece_5, bisect_by=Plane(origin=(50.5, -31.2, -29.5), z_dir=(0, 0, -1)), keep=Keep.TOP, mode=Mode.PRIVATE)
    add(fillet_1_piece_5)
    with BuildSketch(Plane(origin=(50.5, 25.8, -37), x_dir=(0, -1, 0), z_dir=(0, 0, 1))) as fillet_1_piece_6_section:
        with BuildLine():
            CenterArc((FILLET_1_R, -FILLET_1_R), FILLET_1_R, 90, 90)
            Line((0, -FILLET_1_R), (0, 0))
            Line((0, 0), (FILLET_1_R, 0))
        make_face()
    fillet_1_piece_6 = extrude(amount=37, mode=Mode.PRIVATE)
    fillet_1_piece_6 = split(fillet_1_piece_6, bisect_by=Plane(origin=(50.5, 23.000577725, -37), z_dir=(0, -1, 0)), keep=Keep.TOP, mode=Mode.PRIVATE)
    fillet_1_piece_6 = split(fillet_1_piece_6, bisect_by=Plane(origin=(50.5, 25.8, -31), z_dir=(0, 0, -1)), keep=Keep.TOP, mode=Mode.PRIVATE)
    add(fillet_1_piece_6)
    with BuildSketch(Plane(origin=(50.5, 25.8, -37), x_dir=(0, -1, 0), z_dir=(0, 0, 1))) as fillet_1_piece_7_section:
        with BuildLine():
            CenterArc((FILLET_1_R, -FILLET_1_R), FILLET_1_R, 90, 90)
            Line((0, -FILLET_1_R), (0, 0))
            Line((0, 0), (FILLET_1_R, 0))
        make_face()
    fillet_1_piece_7 = extrude(amount=37, mode=Mode.PRIVATE)
    fillet_1_piece_7 = split(fillet_1_piece_7, bisect_by=Plane(origin=(50.5, 23.000577725, -37), z_dir=(0, 1, 0)), keep=Keep.TOP, mode=Mode.PRIVATE)
    fillet_1_piece_7 = split(fillet_1_piece_7, bisect_by=Plane(origin=(50.5, 25.8, -31), z_dir=(0, 0, -1)), keep=Keep.TOP, mode=Mode.PRIVATE)
    add(fillet_1_piece_7)
    with BuildSketch(Plane(origin=(50.5, 25.8, -37), x_dir=(0, -1, 0), z_dir=(0, 0, 1))) as fillet_1_piece_8_section:
        with BuildLine():
            CenterArc((FILLET_1_R, -FILLET_1_R), FILLET_1_R, 90, 90)
            Line((0, -FILLET_1_R), (0, 0))
            Line((0, 0), (FILLET_1_R, 0))
        make_face()
    fillet_1_piece_8 = extrude(amount=37, mode=Mode.PRIVATE)
    fillet_1_piece_8 = split(fillet_1_piece_8, bisect_by=Plane(origin=(50.5, 23.000577725, -37), z_dir=(0, 1, 0)), keep=Keep.TOP, mode=Mode.PRIVATE)
    fillet_1_piece_8 = split(fillet_1_piece_8, bisect_by=Plane(origin=(50.5, 25.8, -31), z_dir=(0, 0, 1)), keep=Keep.TOP, mode=Mode.PRIVATE)
    fillet_1_piece_8 = split(fillet_1_piece_8, bisect_by=Plane(origin=(50.5, 25.8, -14.5), z_dir=(0, 0, -1)), keep=Keep.TOP, mode=Mode.PRIVATE)
    add(fillet_1_piece_8)
    with BuildSketch(Plane(origin=(50.5, 25.8, -37), x_dir=(0, -1, 0), z_dir=(0, 0, 1))) as fillet_1_piece_9_section:
        with BuildLine():
            CenterArc((FILLET_1_R, -FILLET_1_R), FILLET_1_R, 90, 90)
            Line((0, -FILLET_1_R), (0, 0))
            Line((0, 0), (FILLET_1_R, 0))
        make_face()
    fillet_1_piece_9 = extrude(amount=37, mode=Mode.PRIVATE)
    fillet_1_piece_9 = split(fillet_1_piece_9, bisect_by=Plane(origin=(50.5, 23.000577725, -37), z_dir=(0, -1, 0)), keep=Keep.TOP, mode=Mode.PRIVATE)
    fillet_1_piece_9 = split(fillet_1_piece_9, bisect_by=Plane(origin=(50.5, 25.8, -14.5), z_dir=(0, 0, 1)), keep=Keep.TOP, mode=Mode.PRIVATE)
    add(fillet_1_piece_9)
    with BuildSketch(Plane(origin=(50.5, 25.8, -37), x_dir=(0, -1, 0), z_dir=(0, 0, 1))) as fillet_1_piece_10_section:
        with BuildLine():
            CenterArc((FILLET_1_R, -FILLET_1_R), FILLET_1_R, 90, 90)
            Line((0, -FILLET_1_R), (0, 0))
            Line((0, 0), (FILLET_1_R, 0))
        make_face()
    fillet_1_piece_10 = extrude(amount=37, mode=Mode.PRIVATE)
    fillet_1_piece_10 = split(fillet_1_piece_10, bisect_by=Plane(origin=(50.5, 23.000577725, -37), z_dir=(0, 1, 0)), keep=Keep.TOP, mode=Mode.PRIVATE)
    fillet_1_piece_10 = split(fillet_1_piece_10, bisect_by=Plane(origin=(50.5, 25.8, -14.5), z_dir=(0, 0, 1)), keep=Keep.TOP, mode=Mode.PRIVATE)
    add(fillet_1_piece_10)
    with BuildSketch(Plane(origin=(-39.5, -31.2, -10), x_dir=(0, 1, 0), z_dir=(0, 0, -1))) as fillet_1_piece_11:
        with BuildLine():
            CenterArc((FILLET_1_R, FILLET_1_R), FILLET_1_R, 180, 90)
            Line((0, FILLET_1_R), (0, 0))
            Line((0, 0), (FILLET_1_R, 0))
        make_face()
    extrude(amount=27)
    with BuildSketch(Plane(origin=(-39.5, 25.8, 0), x_dir=(1, 0, 0), z_dir=(0, 0, -1))) as fillet_1_piece_12:
        with BuildLine():
            CenterArc((FILLET_1_R, FILLET_1_R), FILLET_1_R, 180, 90)
            Line((0, FILLET_1_R), (0, 0))
            Line((0, 0), (FILLET_1_R, 0))
        make_face()
    extrude(amount=37)
    # the kernel refuses this fillet: 3 mm, written as the material it takes off along each edge
    with BuildSketch(Plane(origin=(-44.5, -36.2, -17), x_dir=(1, 0, 0), z_dir=(0, 0, -1)), Plane(origin=(55.5, -36.2, -17), x_dir=(0, 1, 0), z_dir=(0, 0, -1)), Plane(origin=(-44.5, 30.8, -17), x_dir=(0, -1, 0), z_dir=(0, 0, -1))) as fillet_1_2_piece_1:
        with BuildLine():
            CenterArc((FILLET_1_R, -FILLET_1_R), FILLET_1_R, 90, 90)
            Line((0, -FILLET_1_R), (0, 0))
            Line((0, 0), (FILLET_1_R, 0))
        make_face()
    extrude(amount=27.5, mode=Mode.SUBTRACT)
    with BuildSketch(Plane(origin=(55.5, 30.8, -17), x_dir=(0, -1, 0), z_dir=(0, 0, -1))) as fillet_1_2_piece_2:
        with BuildLine():
            CenterArc((FILLET_1_R, FILLET_1_R), FILLET_1_R, 180, 90)
            Line((0, FILLET_1_R), (0, 0))
            Line((0, 0), (FILLET_1_R, 0))
        make_face()
    extrude(amount=27.5, mode=Mode.SUBTRACT)

    # 스케치17 → 컷-돌출8 (cut)
    with BuildSketch(Plane(origin=(0, 0, -37), x_dir=(-1, 0, 0), z_dir=(0, 0, -1))):
        with Locations((-52.5, -33.2)):
            Circle(SKETCH_17_R)
        with Locations(Location((41.533478294, -32.122994894, 0), (0, 0, 180))):
            Circle(SKETCH_17_R)
        with Locations((41.533478294, 26.722994894)):
            Circle(SKETCH_17_R)
        with Locations(Location((-52.5, 27.8, 0), (0, 0, 180))):
            Circle(SKETCH_17_R)
    extrude(amount=-CUT_EXTRUDE_8_DEPTH, mode=Mode.SUBTRACT)


solid = part.part
